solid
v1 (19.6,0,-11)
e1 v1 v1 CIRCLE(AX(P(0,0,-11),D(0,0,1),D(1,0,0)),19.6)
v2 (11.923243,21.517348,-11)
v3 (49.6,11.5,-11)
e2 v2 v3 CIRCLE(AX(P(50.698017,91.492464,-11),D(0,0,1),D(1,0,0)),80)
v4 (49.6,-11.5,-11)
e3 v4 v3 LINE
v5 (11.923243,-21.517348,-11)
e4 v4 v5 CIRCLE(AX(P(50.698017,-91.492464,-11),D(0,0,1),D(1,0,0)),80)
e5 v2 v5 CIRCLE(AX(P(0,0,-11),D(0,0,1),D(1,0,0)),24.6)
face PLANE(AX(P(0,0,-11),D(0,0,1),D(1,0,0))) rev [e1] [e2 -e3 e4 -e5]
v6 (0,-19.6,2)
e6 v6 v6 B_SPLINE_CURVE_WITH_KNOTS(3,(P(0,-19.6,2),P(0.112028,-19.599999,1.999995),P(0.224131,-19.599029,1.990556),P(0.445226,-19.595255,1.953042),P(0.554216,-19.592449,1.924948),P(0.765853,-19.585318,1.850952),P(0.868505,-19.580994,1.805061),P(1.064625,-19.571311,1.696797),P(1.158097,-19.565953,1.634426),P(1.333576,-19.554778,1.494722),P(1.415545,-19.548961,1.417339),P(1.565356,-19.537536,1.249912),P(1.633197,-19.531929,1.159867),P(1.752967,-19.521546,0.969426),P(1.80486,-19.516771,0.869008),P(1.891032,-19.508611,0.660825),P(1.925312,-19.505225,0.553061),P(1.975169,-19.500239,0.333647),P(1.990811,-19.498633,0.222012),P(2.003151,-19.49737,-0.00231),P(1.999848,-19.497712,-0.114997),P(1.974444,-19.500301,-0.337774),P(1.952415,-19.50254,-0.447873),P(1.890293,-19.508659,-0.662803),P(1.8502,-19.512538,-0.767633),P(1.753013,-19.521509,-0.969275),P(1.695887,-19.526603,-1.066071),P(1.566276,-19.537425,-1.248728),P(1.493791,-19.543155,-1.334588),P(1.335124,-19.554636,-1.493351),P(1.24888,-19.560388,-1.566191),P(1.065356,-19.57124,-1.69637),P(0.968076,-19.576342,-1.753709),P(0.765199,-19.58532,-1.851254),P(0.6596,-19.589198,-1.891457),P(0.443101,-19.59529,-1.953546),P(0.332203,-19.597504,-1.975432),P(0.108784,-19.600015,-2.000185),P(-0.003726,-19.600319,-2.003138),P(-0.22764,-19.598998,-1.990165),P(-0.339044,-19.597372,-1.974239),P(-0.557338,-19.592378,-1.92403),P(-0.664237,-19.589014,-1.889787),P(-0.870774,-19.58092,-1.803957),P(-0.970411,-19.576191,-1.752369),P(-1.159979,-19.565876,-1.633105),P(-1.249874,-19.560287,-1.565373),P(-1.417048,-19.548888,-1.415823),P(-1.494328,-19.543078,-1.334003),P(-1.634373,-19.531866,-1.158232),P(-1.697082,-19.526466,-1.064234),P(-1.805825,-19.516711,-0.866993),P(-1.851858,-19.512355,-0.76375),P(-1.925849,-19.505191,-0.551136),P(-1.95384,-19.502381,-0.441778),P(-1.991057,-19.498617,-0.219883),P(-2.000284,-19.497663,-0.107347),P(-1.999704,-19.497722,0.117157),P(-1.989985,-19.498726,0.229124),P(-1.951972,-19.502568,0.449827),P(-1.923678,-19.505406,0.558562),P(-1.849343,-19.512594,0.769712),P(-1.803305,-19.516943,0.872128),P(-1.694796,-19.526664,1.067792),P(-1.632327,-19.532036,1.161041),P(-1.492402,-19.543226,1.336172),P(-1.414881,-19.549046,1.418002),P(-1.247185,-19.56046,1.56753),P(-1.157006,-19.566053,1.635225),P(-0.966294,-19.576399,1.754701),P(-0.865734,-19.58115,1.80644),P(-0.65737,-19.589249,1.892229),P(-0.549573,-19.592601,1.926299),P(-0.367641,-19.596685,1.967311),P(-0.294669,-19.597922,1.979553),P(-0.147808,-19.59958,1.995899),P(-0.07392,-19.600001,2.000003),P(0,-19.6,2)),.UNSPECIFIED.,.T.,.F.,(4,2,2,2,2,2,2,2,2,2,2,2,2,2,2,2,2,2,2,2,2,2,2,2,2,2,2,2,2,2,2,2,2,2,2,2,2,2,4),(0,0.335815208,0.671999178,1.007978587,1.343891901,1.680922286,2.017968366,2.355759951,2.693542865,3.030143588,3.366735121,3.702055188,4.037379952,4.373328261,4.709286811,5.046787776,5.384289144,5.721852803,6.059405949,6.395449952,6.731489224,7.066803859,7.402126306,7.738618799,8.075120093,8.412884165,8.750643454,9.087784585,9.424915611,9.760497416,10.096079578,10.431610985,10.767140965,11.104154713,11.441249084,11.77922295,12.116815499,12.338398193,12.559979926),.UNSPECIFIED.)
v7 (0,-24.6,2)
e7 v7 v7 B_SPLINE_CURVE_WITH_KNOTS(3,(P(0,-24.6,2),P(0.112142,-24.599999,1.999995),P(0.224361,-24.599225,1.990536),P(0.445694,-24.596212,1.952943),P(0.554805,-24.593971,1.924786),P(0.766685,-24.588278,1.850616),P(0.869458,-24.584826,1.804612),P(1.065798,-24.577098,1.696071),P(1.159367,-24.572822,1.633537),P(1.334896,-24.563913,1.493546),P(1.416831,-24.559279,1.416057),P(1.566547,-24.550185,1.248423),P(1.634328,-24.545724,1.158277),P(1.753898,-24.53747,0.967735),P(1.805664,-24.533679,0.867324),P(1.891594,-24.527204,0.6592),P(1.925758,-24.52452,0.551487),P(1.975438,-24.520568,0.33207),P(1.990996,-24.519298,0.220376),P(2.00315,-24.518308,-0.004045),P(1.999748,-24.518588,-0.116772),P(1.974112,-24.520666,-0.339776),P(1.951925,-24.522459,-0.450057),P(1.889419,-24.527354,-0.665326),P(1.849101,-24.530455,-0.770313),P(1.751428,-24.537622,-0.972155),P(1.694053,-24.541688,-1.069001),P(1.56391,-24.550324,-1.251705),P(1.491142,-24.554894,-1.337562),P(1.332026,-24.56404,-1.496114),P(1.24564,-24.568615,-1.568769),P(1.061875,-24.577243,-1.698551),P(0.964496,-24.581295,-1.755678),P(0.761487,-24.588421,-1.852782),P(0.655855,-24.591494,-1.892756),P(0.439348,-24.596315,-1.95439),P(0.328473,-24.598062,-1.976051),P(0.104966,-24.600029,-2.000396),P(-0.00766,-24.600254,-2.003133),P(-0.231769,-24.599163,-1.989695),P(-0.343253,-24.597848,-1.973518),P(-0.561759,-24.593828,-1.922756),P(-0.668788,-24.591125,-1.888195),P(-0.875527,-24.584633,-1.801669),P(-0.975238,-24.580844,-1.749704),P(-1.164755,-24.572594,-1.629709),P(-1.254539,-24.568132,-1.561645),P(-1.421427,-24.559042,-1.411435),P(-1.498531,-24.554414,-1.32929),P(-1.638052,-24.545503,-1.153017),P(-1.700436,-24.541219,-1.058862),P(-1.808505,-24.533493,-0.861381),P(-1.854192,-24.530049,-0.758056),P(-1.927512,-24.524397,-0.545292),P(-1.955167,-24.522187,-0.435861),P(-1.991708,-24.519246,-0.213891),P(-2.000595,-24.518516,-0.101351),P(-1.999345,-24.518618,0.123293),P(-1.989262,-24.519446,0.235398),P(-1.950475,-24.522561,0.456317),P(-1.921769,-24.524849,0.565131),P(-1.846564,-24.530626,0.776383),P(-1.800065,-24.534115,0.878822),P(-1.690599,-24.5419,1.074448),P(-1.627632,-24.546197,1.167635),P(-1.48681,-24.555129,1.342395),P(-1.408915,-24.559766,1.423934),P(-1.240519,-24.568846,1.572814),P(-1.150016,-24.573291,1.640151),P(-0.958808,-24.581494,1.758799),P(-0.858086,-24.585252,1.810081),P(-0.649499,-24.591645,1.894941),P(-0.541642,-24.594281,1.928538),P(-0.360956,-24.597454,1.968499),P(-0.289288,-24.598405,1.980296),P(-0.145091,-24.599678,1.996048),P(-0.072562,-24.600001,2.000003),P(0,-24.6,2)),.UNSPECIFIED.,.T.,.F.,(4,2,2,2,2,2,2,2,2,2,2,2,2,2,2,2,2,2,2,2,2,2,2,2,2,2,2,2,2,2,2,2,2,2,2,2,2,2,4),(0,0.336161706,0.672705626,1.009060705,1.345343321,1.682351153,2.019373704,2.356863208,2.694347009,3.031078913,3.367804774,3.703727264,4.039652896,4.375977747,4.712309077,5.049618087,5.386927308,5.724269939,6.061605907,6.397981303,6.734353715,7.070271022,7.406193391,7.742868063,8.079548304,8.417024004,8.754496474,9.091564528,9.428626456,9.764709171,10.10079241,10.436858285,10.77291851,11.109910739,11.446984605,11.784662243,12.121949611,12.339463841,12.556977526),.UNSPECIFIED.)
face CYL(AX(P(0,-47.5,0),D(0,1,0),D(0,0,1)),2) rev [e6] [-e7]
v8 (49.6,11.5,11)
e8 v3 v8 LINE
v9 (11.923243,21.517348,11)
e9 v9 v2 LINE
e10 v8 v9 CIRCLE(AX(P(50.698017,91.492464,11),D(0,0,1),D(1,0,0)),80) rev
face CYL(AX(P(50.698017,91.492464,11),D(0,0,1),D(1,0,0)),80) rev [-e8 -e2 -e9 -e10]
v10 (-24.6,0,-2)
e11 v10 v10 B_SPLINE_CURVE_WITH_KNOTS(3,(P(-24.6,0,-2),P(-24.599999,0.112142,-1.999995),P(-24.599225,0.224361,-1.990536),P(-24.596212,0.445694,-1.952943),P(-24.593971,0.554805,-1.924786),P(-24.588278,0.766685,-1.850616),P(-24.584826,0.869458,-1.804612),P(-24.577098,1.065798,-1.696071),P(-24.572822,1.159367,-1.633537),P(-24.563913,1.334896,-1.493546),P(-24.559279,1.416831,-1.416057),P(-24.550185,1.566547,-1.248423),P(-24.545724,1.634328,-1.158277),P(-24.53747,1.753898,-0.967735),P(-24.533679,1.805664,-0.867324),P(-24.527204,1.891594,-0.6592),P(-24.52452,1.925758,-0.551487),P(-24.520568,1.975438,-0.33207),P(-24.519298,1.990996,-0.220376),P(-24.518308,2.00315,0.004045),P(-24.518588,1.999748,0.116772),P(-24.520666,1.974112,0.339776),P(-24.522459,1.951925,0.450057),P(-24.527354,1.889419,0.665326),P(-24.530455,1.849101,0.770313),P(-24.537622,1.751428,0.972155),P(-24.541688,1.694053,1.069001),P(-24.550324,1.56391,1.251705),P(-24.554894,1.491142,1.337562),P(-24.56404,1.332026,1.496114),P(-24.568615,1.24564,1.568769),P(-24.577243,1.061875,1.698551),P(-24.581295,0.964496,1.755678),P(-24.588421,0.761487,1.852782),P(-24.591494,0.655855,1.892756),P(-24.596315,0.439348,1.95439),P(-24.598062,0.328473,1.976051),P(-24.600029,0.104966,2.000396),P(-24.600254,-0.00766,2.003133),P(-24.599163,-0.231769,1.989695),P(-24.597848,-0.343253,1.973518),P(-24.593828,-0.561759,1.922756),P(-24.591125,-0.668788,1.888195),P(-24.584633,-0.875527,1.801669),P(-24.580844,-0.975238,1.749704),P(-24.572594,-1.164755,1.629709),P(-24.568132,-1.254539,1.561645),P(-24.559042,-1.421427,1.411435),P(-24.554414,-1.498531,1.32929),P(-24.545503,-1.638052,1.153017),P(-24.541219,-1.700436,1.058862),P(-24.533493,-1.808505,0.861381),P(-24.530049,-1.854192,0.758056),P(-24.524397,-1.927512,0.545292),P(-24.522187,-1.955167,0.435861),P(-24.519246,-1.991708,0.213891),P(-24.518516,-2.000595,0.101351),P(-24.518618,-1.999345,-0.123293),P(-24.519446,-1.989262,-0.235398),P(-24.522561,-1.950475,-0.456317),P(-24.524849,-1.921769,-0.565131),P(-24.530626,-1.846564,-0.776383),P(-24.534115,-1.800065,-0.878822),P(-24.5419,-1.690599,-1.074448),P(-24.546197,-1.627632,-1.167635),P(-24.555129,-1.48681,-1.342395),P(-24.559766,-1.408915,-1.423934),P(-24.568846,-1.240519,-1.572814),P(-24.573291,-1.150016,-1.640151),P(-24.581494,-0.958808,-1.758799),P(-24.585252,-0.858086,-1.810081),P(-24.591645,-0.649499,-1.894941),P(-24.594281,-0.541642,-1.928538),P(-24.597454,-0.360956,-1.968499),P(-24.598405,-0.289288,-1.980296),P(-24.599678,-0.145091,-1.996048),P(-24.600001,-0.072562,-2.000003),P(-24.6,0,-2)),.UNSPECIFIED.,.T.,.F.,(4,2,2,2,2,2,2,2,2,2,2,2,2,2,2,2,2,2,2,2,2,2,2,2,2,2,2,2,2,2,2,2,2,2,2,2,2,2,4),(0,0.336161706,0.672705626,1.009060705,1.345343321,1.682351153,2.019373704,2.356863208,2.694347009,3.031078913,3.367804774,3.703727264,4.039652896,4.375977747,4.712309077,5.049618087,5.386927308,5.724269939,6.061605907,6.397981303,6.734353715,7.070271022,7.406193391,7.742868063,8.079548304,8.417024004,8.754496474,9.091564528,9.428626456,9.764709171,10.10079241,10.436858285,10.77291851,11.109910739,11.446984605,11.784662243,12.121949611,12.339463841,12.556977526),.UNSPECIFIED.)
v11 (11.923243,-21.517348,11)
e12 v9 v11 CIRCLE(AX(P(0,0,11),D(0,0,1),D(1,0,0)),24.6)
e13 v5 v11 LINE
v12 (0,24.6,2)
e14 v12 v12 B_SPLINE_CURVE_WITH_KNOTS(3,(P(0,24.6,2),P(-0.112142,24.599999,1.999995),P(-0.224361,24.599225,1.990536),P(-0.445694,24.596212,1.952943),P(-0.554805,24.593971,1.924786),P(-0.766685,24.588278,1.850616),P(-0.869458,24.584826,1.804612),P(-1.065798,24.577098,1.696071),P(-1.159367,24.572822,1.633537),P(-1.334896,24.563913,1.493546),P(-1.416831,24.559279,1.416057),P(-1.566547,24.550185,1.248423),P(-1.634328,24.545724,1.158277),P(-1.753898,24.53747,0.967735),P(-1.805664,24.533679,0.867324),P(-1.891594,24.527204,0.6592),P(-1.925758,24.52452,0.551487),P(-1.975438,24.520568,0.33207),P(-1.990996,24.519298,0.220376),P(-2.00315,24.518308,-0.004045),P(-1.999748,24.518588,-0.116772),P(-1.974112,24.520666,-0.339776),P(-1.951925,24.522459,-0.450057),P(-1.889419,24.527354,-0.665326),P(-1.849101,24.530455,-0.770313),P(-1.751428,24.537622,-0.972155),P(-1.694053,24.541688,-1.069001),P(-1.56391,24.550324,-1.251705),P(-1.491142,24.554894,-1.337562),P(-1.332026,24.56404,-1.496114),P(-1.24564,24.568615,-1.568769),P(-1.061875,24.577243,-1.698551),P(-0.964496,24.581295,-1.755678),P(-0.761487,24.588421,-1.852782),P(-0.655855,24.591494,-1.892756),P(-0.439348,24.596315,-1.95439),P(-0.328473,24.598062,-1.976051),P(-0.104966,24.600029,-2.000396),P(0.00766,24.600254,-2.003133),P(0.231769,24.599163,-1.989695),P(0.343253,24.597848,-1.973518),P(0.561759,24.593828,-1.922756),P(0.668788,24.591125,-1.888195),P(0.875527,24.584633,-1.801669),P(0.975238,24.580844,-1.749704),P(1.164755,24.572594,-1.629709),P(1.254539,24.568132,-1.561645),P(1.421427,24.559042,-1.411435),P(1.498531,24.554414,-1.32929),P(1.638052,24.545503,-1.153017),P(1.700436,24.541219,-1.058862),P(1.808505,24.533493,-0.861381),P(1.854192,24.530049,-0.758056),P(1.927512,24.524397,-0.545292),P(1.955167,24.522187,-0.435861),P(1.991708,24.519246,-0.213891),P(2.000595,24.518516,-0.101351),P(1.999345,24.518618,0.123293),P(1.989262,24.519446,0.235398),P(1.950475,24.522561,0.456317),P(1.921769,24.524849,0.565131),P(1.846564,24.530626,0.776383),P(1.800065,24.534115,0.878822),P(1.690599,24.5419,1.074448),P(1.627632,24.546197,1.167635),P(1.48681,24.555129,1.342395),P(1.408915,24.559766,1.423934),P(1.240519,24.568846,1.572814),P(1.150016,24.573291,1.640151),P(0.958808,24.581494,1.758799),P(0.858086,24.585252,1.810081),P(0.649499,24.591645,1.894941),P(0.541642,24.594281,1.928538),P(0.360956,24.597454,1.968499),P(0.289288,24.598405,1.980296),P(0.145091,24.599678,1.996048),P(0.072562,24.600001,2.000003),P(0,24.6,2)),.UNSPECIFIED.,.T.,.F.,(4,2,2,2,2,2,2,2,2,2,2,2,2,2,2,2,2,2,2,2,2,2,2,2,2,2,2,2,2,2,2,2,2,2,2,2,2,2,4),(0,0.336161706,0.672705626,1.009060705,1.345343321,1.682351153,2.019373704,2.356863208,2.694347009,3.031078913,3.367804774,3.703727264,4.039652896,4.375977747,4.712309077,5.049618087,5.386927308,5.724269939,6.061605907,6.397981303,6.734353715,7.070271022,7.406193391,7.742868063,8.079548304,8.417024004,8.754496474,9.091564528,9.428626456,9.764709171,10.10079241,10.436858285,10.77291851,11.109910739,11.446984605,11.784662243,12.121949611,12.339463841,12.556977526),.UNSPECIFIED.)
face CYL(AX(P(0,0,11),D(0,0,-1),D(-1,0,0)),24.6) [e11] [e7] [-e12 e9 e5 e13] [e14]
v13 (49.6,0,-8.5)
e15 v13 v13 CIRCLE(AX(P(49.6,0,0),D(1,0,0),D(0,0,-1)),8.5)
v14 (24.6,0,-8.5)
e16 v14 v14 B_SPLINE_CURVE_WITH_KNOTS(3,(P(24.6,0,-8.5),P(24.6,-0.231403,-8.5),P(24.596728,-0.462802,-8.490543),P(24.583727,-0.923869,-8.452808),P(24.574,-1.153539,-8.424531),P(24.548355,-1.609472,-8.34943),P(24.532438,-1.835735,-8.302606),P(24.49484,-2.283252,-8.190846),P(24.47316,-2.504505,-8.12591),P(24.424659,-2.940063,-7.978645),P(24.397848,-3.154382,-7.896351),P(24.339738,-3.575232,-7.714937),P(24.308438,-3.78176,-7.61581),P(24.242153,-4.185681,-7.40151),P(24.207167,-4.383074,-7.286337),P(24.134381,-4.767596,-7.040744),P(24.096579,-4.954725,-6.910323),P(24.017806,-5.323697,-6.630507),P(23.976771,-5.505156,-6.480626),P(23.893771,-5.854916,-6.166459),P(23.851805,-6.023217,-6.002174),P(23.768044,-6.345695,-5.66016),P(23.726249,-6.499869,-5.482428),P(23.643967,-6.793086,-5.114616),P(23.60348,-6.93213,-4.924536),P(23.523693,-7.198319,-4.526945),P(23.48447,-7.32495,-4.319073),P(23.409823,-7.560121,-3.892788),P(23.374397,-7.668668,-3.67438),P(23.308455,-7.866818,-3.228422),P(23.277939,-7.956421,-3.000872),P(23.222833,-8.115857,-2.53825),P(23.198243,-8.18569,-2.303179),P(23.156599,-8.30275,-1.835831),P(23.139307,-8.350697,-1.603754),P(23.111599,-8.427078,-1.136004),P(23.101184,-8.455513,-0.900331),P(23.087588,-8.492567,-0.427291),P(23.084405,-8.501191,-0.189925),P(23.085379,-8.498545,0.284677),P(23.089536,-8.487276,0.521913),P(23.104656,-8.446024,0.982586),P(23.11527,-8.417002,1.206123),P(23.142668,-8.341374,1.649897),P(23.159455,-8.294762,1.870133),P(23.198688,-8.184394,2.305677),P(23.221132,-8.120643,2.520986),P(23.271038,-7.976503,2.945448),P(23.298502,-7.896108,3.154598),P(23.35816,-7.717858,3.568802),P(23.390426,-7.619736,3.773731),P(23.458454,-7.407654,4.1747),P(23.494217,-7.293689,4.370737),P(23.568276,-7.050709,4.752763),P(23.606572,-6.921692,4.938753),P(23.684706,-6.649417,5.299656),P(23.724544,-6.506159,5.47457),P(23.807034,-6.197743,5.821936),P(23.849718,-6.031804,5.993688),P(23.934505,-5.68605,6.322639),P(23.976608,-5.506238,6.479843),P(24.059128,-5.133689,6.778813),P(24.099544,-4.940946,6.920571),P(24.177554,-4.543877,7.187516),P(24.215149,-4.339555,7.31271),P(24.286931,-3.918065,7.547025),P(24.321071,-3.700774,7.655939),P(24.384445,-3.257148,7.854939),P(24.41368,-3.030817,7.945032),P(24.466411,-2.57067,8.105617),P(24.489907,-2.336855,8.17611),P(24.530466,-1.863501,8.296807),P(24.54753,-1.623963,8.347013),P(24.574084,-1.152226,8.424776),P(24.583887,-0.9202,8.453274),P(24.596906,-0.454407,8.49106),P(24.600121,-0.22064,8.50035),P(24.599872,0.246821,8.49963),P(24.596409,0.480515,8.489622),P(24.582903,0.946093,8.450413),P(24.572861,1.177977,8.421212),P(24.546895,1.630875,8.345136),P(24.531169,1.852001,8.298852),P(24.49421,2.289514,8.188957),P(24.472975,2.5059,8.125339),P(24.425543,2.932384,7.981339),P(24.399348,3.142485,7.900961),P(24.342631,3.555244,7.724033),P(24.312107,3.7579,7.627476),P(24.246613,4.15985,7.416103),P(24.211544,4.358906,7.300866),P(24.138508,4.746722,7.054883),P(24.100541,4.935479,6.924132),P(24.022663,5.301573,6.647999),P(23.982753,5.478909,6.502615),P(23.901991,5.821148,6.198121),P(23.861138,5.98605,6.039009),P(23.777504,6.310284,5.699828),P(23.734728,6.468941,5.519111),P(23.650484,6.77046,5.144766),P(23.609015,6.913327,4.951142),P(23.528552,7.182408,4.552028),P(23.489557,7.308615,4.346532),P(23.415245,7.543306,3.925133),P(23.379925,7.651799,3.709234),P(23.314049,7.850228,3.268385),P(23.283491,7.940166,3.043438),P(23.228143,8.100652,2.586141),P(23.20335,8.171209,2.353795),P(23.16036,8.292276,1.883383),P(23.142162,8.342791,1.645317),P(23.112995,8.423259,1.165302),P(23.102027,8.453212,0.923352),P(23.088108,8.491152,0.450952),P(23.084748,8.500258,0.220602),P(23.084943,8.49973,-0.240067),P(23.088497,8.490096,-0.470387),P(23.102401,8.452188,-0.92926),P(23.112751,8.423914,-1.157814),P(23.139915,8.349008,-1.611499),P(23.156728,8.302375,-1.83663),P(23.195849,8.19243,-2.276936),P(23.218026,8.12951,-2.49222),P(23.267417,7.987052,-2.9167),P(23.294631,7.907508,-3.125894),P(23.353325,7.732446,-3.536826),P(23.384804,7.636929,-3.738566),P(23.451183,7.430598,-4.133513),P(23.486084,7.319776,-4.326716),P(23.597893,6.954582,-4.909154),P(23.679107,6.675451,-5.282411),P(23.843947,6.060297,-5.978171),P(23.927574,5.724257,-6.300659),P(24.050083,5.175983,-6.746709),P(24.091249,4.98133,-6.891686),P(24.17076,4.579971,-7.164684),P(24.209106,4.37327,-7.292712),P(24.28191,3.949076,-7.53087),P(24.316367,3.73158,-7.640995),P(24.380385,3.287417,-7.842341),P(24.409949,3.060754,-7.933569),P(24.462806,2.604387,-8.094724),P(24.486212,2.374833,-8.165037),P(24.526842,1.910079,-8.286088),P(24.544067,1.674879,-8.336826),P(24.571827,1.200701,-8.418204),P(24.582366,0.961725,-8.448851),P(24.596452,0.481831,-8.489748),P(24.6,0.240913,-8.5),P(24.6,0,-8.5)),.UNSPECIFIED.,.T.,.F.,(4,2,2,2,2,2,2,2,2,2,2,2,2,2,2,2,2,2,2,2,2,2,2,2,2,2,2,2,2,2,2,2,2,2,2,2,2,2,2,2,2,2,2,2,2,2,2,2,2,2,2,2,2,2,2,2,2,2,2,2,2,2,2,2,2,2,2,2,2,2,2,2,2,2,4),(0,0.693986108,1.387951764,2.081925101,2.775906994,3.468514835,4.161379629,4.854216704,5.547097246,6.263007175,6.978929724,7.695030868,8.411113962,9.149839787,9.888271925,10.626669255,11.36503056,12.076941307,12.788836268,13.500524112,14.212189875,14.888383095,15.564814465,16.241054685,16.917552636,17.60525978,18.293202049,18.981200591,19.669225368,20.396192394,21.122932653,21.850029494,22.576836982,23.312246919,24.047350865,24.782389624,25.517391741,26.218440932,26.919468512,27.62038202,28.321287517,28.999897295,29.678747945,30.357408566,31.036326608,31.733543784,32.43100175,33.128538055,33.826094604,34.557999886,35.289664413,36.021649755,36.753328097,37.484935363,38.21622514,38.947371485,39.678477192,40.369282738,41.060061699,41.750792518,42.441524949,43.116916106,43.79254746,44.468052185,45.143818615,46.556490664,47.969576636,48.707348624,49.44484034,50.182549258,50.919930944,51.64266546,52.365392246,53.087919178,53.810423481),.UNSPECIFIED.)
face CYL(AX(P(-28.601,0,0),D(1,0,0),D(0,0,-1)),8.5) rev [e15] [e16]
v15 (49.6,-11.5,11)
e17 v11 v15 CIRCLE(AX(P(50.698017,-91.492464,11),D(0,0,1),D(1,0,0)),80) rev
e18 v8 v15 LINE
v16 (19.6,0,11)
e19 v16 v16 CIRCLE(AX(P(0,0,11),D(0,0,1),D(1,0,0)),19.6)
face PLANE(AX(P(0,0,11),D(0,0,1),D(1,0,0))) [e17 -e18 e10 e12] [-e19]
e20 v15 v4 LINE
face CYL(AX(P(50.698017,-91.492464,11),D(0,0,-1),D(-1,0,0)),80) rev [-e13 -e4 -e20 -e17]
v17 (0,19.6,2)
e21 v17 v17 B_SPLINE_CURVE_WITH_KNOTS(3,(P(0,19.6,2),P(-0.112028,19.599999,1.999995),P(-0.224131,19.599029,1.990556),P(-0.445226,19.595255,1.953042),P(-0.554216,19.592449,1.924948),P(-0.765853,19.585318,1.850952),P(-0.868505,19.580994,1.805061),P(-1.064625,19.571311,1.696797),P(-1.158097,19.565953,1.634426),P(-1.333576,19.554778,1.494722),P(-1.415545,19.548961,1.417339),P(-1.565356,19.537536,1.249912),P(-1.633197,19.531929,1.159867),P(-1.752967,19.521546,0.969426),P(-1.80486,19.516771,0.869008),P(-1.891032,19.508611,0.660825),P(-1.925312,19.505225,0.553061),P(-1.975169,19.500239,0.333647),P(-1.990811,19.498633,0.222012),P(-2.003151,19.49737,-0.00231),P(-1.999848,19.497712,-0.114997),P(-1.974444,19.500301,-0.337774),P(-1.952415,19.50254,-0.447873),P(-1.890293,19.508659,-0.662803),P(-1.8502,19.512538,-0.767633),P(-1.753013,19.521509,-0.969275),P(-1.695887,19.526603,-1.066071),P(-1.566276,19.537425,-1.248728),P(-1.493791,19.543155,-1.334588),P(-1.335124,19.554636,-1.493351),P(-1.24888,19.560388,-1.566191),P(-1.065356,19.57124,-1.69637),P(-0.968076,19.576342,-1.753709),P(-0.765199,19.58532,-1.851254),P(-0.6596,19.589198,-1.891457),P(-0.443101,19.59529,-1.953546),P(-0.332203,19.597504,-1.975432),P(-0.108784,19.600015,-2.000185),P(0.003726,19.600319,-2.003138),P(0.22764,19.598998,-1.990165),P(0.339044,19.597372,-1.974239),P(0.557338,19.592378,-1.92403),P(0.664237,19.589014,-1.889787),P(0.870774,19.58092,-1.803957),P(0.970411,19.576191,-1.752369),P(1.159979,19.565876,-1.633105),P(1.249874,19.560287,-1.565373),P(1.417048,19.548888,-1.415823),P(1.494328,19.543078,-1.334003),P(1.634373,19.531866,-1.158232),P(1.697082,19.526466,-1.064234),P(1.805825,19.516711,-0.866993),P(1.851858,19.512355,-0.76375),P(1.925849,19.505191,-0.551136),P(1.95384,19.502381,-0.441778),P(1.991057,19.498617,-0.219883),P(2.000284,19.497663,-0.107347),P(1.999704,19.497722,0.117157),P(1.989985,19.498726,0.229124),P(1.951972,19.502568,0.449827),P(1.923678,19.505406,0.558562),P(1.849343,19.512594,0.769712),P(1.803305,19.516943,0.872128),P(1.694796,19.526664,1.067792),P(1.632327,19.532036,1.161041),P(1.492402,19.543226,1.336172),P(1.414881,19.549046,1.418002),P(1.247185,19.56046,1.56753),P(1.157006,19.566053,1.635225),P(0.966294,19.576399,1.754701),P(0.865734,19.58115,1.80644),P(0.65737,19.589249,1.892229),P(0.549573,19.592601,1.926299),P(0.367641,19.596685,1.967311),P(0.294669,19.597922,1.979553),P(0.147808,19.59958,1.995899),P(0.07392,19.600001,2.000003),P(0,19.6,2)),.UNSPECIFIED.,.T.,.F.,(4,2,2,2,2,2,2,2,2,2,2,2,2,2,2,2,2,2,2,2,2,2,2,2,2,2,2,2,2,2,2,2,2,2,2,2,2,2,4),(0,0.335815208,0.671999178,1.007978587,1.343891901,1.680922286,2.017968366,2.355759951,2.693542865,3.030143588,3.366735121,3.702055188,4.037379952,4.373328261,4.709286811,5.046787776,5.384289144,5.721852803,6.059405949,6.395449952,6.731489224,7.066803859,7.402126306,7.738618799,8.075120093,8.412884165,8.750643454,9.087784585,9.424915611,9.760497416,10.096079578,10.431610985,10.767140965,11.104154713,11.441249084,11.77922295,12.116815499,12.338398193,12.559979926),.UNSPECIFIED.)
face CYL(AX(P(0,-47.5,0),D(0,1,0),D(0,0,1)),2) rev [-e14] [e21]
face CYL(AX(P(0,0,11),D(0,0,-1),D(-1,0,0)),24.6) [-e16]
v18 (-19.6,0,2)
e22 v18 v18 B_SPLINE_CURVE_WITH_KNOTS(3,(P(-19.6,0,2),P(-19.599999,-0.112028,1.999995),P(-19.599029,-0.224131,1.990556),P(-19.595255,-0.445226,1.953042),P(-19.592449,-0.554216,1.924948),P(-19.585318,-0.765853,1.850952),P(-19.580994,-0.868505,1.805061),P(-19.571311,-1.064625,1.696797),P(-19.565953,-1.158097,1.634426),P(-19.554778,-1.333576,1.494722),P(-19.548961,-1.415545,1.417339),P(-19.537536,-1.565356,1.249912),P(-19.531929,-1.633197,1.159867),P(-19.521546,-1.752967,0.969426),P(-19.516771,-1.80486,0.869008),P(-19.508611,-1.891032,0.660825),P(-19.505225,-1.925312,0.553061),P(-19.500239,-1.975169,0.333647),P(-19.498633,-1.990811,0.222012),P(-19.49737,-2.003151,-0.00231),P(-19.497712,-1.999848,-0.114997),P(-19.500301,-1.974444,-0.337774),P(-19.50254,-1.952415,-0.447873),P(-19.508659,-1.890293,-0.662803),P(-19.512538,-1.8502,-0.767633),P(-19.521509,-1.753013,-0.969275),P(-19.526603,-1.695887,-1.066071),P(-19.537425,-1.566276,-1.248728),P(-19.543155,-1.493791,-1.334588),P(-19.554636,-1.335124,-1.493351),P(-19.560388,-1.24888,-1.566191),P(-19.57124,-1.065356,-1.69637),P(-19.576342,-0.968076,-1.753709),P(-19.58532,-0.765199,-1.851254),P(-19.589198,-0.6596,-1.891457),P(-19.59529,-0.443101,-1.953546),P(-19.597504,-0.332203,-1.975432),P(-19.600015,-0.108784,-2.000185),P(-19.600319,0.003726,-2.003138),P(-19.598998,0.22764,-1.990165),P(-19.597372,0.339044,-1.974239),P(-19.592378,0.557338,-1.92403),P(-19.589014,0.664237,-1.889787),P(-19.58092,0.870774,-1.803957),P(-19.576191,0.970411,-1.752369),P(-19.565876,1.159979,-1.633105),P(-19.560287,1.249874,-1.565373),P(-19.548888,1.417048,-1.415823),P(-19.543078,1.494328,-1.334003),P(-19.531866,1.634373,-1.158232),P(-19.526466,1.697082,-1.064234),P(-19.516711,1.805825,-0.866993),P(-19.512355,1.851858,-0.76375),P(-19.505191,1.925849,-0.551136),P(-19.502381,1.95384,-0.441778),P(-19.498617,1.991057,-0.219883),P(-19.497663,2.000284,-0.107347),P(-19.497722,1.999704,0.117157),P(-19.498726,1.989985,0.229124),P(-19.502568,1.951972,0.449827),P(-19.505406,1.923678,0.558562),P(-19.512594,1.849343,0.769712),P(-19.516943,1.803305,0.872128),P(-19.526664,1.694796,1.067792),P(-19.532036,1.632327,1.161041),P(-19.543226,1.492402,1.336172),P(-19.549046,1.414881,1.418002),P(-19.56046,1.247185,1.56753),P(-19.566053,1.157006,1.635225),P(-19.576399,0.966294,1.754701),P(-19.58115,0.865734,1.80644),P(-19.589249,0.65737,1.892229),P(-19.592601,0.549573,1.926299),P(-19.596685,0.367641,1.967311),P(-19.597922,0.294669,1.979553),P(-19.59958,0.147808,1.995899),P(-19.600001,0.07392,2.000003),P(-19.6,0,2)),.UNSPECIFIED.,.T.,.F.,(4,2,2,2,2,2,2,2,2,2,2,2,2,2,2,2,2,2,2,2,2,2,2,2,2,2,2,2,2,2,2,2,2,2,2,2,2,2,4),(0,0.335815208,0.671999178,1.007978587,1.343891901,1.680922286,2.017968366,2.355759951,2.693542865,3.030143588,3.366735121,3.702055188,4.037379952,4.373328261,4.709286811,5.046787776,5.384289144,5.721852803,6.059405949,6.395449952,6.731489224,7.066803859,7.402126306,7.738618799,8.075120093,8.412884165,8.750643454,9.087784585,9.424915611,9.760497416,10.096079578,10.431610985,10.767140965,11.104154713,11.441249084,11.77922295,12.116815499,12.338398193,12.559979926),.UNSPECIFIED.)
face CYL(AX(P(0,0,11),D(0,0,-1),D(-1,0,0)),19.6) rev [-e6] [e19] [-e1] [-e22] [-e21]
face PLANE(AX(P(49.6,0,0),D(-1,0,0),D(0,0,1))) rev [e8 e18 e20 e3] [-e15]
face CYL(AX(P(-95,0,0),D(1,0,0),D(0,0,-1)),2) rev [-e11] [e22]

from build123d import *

# Parameters (mm, degrees)
CROQUIS1_R                               = 24.6
CROQUIS1_R_2                             = 19.6
SALIENTE_EXTRUIR1_DEPTH                  = 11
CROQUIS2_W                               = 22
CROQUIS2_H                               = 23
CROQUIS2_R                               = 8.5
SALIENTE_EXTRUIR2_DEPTH                  = 25
SALIENTE_EXTRUIR2_DIRECTION_2_REACH      = 58.096
SALIENTE_EXTRUIR2_DIRECTION_2_END_RADIUS = 24.6
CROQUIS3_R                               = 2
CORTAR_EXTRUIR1_DEPTH                    = 47.5
CROQUIS4_R                               = 2
CORTAR_EXTRUIR2_DEPTH                    = 95
REDONDEO1_R                              = 80


with BuildPart() as part:
    # Croquis1 → Saliente-Extruir1 (new, symmetric)
    with BuildSketch(Plane.XY):
        Circle(CROQUIS1_R)
        Circle(CROQUIS1_R_2, mode=Mode.SUBTRACT)
    extrude(amount=SALIENTE_EXTRUIR1_DEPTH, both=True)

    # Croquis2 → Saliente-Extruir2 (add)
    with BuildSketch(Plane(origin=(24.6, 0, 0), x_dir=(0, 0, -1), z_dir=(1, 0, 0))):
        Rectangle(CROQUIS2_W, CROQUIS2_H)
        Circle(CROQUIS2_R, mode=Mode.SUBTRACT)
    extrude(amount=SALIENTE_EXTRUIR2_DEPTH)

    # Saliente-Extruir2 direction 2: up to this cylinder (the profile starts outside it)
    saliente_extruir2_direction_2_end = Plane(origin=(0, 0, 0), z_dir=(0, 0, -1)) * Cylinder(SALIENTE_EXTRUIR2_DIRECTION_2_END_RADIUS, 166.392, mode=Mode.PRIVATE)
    # Croquis2 → Saliente-Extruir2 direction 2 (add, up to the surface)
    with BuildSketch(Plane(origin=(24.6, 0, 0), x_dir=(0, 0, -1), z_dir=(1, 0, 0)), mode=Mode.PRIVATE) as saliente_extruir2_direction_2_sk1:
        Rectangle(CROQUIS2_W, CROQUIS2_H)
        Circle(CROQUIS2_R, mode=Mode.SUBTRACT)
    saliente_extruir2_direction_2_tool1 = extrude(saliente_extruir2_direction_2_sk1.sketch, amount=-SALIENTE_EXTRUIR2_DIRECTION_2_REACH, mode=Mode.PRIVATE) - saliente_extruir2_direction_2_end
    add(saliente_extruir2_direction_2_tool1.solids().sort_by_distance((24.6, -11.181723, 0))[0])
    add(saliente_extruir2_direction_2_tool1.solids().sort_by_distance((24.6, -11.181723, 0))[1])

    # Croquis3 → Cortar-Extruir1 (cut, symmetric)
    with BuildSketch(Plane(origin=(0, 0, 0), x_dir=(1, 0, 0), z_dir=(0, 1, 0))):
        with Locations(Location((0, 0, 0), (0, 0, 270))):
            Circle(CROQUIS3_R)
    extrude(amount=CORTAR_EXTRUIR1_DEPTH, both=True, mode=Mode.SUBTRACT)

    # Croquis4 → Cortar-Extruir2 (cut)
    with BuildSketch(Plane(origin=(0, 0, 0), x_dir=(0, 0, -1), z_dir=(1, 0, 0))):
        Circle(CROQUIS4_R)
    extrude(amount=-CORTAR_EXTRUIR2_DEPTH, mode=Mode.SUBTRACT)

    # Redondeo1
    # the kernel refuses this fillet: 80 mm, written as the material it adds along each edge
    with BuildSketch(Plane(origin=(21.74649397, 11.5, 11), x_dir=(-0.7001557683573276, 0.713990126007328, 0), z_dir=(0, 0, -1))) as redondeo1_piece_1:
        with BuildLine():
            CenterArc((36.84325364, 76.678287175), REDONDEO1_R, 225.225924333, 28.205393766)
            Line((-19.501792916, 19.88712828), (-20.628693847, 18.751305102))
            ThreePointArc((-20.628693847, 18.751305102), (-10.893280659, 8.823314911), (-1.142384202, -1.120249229))
            Line((-1.142384202, -1.120249229), (0.456263203, -1.533565743))
            ThreePointArc((0.456263203, -1.533565743), (7.015046746, -0.578573306), (13.573830289, -1.533565743))
            Line((13.573830289, -1.533565743), (14.030093492, 0))
        make_face()
    extrude(amount=22)
    with BuildSketch(Plane(origin=(21.74649397, -11.5, 11), x_dir=(-0.7001557683573284, -0.7139901260073274, 0), z_dir=(0, 0, -1))) as redondeo1_piece_2:
        with BuildLine():
            CenterArc((36.84325364, -76.678287175), REDONDEO1_R, 106.568681901, 28.205393766)
            Line((-19.501792916, -19.88712828), (-20.628693847, -18.751305102))
            ThreePointArc((-20.628693847, -18.751305102), (-10.893280659, -8.823314911), (-1.142384202, 1.120249229))
            Line((-1.142384202, 1.120249229), (0.456263203, 1.533565743))
            ThreePointArc((0.456263203, 1.533565743), (7.015046746, 0.578573306), (13.573830289, 1.533565743))
            Line((13.573830289, 1.533565743), (14.030093492, 0))
        make_face()
    extrude(amount=22)


solid = part.part
